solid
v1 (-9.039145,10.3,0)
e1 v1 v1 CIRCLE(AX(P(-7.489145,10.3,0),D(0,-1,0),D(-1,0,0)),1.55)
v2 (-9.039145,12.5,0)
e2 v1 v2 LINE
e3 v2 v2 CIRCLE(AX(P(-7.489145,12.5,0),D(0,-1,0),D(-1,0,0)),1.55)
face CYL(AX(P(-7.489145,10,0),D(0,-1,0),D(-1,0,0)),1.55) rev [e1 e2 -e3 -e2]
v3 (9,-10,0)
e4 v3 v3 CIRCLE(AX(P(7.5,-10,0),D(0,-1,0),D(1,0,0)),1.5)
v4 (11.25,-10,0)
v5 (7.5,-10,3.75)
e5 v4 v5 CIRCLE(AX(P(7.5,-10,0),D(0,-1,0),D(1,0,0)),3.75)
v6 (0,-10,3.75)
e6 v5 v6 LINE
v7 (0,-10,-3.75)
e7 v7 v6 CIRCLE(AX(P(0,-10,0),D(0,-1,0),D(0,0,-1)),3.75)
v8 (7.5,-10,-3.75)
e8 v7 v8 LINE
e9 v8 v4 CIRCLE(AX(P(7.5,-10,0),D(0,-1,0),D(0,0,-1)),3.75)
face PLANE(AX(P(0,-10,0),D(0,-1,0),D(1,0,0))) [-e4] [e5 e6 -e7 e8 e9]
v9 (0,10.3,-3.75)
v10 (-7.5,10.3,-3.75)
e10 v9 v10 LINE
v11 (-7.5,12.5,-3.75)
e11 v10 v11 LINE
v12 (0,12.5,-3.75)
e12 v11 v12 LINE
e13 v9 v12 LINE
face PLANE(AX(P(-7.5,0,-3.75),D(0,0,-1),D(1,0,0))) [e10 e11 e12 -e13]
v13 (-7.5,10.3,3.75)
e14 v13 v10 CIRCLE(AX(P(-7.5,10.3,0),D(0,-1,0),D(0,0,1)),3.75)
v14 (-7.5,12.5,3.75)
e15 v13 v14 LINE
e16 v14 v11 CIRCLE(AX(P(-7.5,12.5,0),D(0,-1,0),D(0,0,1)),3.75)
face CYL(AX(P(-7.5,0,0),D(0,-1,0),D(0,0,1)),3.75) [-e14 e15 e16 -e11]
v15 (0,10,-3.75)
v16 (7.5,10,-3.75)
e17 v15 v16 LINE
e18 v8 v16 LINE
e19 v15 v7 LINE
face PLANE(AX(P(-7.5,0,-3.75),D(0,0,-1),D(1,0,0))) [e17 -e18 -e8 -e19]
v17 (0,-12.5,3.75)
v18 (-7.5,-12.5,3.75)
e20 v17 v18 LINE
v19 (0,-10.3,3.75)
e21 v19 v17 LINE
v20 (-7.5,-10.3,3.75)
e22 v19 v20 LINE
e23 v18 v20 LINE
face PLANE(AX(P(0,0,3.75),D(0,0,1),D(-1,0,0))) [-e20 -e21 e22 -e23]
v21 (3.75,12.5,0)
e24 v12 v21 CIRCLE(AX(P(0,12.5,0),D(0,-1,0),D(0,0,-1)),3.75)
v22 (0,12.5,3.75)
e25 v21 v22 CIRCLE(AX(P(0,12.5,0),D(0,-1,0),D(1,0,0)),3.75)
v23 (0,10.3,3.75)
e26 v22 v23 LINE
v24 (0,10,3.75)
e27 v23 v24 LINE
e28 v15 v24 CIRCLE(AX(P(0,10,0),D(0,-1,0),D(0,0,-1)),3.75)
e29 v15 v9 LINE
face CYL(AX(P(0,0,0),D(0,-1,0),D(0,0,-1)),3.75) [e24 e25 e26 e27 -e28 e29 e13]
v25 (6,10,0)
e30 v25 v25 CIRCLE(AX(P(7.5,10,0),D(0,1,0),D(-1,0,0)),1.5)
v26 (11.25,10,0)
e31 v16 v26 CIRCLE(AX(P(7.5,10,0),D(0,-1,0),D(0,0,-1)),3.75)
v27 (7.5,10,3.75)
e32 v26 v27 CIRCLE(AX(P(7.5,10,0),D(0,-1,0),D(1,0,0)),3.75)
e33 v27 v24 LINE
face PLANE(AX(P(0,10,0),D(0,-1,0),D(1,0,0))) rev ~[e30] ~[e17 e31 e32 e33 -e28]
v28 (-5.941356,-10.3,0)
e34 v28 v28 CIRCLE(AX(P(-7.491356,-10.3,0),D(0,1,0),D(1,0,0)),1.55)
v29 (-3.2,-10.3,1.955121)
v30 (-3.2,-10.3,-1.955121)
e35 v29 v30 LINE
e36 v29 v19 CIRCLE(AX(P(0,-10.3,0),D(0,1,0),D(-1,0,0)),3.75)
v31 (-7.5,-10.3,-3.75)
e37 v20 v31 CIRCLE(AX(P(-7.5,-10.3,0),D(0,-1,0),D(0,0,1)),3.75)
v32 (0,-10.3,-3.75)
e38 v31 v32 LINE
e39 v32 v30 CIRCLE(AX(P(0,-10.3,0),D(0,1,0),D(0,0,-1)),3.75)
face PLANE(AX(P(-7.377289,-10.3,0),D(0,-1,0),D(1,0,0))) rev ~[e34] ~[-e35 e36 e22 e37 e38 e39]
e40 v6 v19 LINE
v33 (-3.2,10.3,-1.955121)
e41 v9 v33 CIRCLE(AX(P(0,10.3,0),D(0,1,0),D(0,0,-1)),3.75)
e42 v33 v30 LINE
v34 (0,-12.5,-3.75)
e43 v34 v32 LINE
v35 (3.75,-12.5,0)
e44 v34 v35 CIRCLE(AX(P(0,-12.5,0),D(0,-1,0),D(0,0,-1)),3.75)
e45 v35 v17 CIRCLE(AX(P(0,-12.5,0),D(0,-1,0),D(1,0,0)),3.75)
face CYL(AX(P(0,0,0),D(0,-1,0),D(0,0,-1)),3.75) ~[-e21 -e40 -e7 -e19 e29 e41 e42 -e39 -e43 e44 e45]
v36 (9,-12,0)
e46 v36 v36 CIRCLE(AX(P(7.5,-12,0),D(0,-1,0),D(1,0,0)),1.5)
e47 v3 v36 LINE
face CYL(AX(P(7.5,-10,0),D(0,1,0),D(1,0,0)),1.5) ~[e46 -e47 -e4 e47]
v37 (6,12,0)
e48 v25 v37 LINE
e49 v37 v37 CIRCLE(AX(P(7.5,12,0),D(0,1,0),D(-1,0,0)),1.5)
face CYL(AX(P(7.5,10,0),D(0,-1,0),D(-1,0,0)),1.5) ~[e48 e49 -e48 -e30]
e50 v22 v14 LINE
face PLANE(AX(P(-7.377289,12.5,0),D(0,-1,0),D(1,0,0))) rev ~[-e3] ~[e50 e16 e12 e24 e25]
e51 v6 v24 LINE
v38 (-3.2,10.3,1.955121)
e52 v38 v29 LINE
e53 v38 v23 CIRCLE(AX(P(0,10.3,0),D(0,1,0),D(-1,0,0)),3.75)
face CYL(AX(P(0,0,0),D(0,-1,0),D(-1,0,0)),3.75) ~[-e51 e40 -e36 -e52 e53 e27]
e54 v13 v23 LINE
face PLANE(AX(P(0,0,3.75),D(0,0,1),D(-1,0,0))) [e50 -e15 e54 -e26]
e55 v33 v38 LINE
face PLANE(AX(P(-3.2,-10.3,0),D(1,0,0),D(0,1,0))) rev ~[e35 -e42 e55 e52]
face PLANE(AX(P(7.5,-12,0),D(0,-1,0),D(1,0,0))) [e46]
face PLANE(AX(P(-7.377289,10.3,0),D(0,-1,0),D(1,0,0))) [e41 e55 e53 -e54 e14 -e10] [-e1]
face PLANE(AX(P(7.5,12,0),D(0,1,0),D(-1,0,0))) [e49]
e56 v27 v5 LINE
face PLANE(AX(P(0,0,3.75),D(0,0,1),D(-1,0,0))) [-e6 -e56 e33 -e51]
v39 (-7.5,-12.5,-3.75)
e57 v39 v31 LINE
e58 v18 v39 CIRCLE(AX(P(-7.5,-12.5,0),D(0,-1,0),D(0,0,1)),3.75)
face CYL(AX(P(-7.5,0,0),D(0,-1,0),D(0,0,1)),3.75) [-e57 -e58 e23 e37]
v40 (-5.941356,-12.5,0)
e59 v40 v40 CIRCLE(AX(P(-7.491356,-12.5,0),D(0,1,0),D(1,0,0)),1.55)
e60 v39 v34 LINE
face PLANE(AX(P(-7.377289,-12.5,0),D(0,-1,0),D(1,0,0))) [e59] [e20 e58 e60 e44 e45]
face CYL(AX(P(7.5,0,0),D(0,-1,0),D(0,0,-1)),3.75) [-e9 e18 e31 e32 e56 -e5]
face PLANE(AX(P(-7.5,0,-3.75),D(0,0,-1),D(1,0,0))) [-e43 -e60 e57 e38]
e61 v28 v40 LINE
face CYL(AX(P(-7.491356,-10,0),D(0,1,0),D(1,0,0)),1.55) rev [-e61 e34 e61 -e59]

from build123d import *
from build123d import SkipClean  # not in build123d's __all__

# Parameters (mm, degrees)
F1_DEPTH  = 10
F2_DEPTH  = 12.5
F3_DEPTH  = 10.3
F4_R      = 1.5
F5_DEPTH  = 2
F4_R_2    = 1.55
F6_DEPTH  = 5
F7_R      = 1.5
F8_DEPTH  = 2
F7_R_2    = 1.55
F9_DEPTH  = 5
F11_DEPTH = 12.5


with BuildPart() as f1:
    # F0 (on Front) → F1 (new body, symmetric)
    with BuildSketch(Plane.XZ):
        with BuildLine():
            ThreePointArc((0, -3.75), (2.6516504294, -2.6516504294), (3.75, 0))
            ThreePointArc((3.75, 0), (2.6516504294, 2.6516504294), (0, 3.75))
            ThreePointArc((0, 3.75), (-2.6516504294, 2.6516504294), (-3.75, 0))
            ThreePointArc((-3.75, 0), (-2.6516504294, -2.6516504294), (0, -3.75))
        make_face()
        with BuildLine():
            ThreePointArc((0, 3.75), (2.6516504294, 2.6516504294), (3.75, 0))
            ThreePointArc((3.75, 0), (4.8483495706, 2.6516504294), (7.5, 3.75))
            Line((7.5, 3.75), (0, 3.75))
        make_face()
        with BuildLine():
            ThreePointArc((7.5, 3.75), (4.8483495706, 2.6516504294), (3.75, 0))
            ThreePointArc((3.75, 0), (4.8483495706, -2.6516504294), (7.5, -3.75))
            ThreePointArc((7.5, -3.75), (10.1516504294, -2.6516504294), (11.25, 0))
            ThreePointArc((11.25, 0), (10.1516504294, 2.6516504294), (7.5, 3.75))
        make_face()
        with BuildLine():
            ThreePointArc((7.5, -3.75), (4.8483495706, -2.6516504294), (3.75, 0))
            ThreePointArc((3.75, 0), (2.6516504294, -2.6516504294), (0, -3.75))
            Line((0, -3.75), (7.5, -3.75))
        make_face()
    extrude(amount=F1_DEPTH, both=True)

    # F0 (on Front) → F2 (join, symmetric)
    with BuildSketch(Plane.XZ):
        with BuildLine():
            ThreePointArc((-7.5, -3.75), (-4.8483495706, -2.6516504294), (-3.75, 0))
            ThreePointArc((-3.75, 0), (-4.8483495706, 2.6516504294), (-7.5, 3.75))
            ThreePointArc((-7.5, 3.75), (-11.25, 0), (-7.5, -3.75))
        make_face()
        with BuildLine():
            ThreePointArc((-3.75, 0), (-2.6516504294, 2.6516504294), (0, 3.75))
            Line((0, 3.75), (-7.5, 3.75))
            ThreePointArc((-7.5, 3.75), (-4.8483495706, 2.6516504294), (-3.75, 0))
        make_face()
        with BuildLine():
            ThreePointArc((0, -3.75), (2.6516504294, -2.6516504294), (3.75, 0))
            ThreePointArc((3.75, 0), (2.6516504294, 2.6516504294), (0, 3.75))
            ThreePointArc((0, 3.75), (-2.6516504294, 2.6516504294), (-3.75, 0))
            ThreePointArc((-3.75, 0), (-2.6516504294, -2.6516504294), (0, -3.75))
        make_face()
        with BuildLine():
            Line((-7.5, -3.75), (0, -3.75))
            ThreePointArc((0, -3.75), (-2.6516504294, -2.6516504294), (-3.75, 0))
            ThreePointArc((-3.75, 0), (-4.8483495706, -2.6516504294), (-7.5, -3.75))
        make_face()
    extrude(amount=F2_DEPTH, both=True)

    # F0 (on Front) → F3 (cut, symmetric)
    with BuildSketch(Plane.XZ):
        with BuildLine():
            ThreePointArc((-7.5, -3.75), (-4.8483495706, -2.6516504294), (-3.75, 0))
            ThreePointArc((-3.75, 0), (-4.8483495706, 2.6516504294), (-7.5, 3.75))
            ThreePointArc((-7.5, 3.75), (-11.25, 0), (-7.5, -3.75))
        make_face()
        with BuildLine():
            Line((-7.5, -3.75), (0, -3.75))
            ThreePointArc((0, -3.75), (-2.6516504294, -2.6516504294), (-3.75, 0))
            ThreePointArc((-3.75, 0), (-4.8483495706, -2.6516504294), (-7.5, -3.75))
        make_face()
        with BuildLine():
            ThreePointArc((-3.75, 0), (-2.6516504294, 2.6516504294), (0, 3.75))
            Line((0, 3.75), (-7.5, 3.75))
            ThreePointArc((-7.5, 3.75), (-4.8483495706, 2.6516504294), (-3.75, 0))
        make_face()
    with SkipClean():  # cleaning this boolean's faces spoils the solid; the shape is the same uncleaned
        extrude(amount=F3_DEPTH, both=True, mode=Mode.SUBTRACT)

    # F4 (on face) → F5 (join)
    with BuildSketch(Plane.XZ.offset(10)):
        with Locations((7.5, 0)):
            Circle(F4_R)
    extrude(amount=F5_DEPTH)

    # F4 (on face) → F6 (cut)
    with BuildSketch(Plane.XZ.offset(10)):
        with Locations((-7.4913557619, 0)):
            Circle(F4_R_2)
    extrude(amount=F6_DEPTH, mode=Mode.SUBTRACT)

    # F7 (on face) → F8 (join)
    with BuildSketch(Plane(origin=(0, 10, 0), x_dir=(-1, 0, 0), z_dir=(0, 1, 0))):
        with Locations((-7.5, 0)):
            Circle(F7_R)
    extrude(amount=F8_DEPTH)

    # F7 (on face) → F9 (cut)
    with BuildSketch(Plane(origin=(0, 10, 0), x_dir=(-1, 0, 0), z_dir=(0, 1, 0))):
        with Locations((7.4891448021, 0)):
            Circle(F7_R_2)
    extrude(amount=F9_DEPTH, mode=Mode.SUBTRACT)

    # F10 (on Top) → F11 (cut, symmetric)
    with BuildSketch(Plane.XY):
        Polygon((-3.2, -10.3), (-3.2, 0), (-3.2, 10.3), (-14.7820527132, 10.3), (-14.7820527132, -10.3), align=None)
    extrude(amount=F11_DEPTH, both=True, mode=Mode.SUBTRACT)


solid = f1.part
